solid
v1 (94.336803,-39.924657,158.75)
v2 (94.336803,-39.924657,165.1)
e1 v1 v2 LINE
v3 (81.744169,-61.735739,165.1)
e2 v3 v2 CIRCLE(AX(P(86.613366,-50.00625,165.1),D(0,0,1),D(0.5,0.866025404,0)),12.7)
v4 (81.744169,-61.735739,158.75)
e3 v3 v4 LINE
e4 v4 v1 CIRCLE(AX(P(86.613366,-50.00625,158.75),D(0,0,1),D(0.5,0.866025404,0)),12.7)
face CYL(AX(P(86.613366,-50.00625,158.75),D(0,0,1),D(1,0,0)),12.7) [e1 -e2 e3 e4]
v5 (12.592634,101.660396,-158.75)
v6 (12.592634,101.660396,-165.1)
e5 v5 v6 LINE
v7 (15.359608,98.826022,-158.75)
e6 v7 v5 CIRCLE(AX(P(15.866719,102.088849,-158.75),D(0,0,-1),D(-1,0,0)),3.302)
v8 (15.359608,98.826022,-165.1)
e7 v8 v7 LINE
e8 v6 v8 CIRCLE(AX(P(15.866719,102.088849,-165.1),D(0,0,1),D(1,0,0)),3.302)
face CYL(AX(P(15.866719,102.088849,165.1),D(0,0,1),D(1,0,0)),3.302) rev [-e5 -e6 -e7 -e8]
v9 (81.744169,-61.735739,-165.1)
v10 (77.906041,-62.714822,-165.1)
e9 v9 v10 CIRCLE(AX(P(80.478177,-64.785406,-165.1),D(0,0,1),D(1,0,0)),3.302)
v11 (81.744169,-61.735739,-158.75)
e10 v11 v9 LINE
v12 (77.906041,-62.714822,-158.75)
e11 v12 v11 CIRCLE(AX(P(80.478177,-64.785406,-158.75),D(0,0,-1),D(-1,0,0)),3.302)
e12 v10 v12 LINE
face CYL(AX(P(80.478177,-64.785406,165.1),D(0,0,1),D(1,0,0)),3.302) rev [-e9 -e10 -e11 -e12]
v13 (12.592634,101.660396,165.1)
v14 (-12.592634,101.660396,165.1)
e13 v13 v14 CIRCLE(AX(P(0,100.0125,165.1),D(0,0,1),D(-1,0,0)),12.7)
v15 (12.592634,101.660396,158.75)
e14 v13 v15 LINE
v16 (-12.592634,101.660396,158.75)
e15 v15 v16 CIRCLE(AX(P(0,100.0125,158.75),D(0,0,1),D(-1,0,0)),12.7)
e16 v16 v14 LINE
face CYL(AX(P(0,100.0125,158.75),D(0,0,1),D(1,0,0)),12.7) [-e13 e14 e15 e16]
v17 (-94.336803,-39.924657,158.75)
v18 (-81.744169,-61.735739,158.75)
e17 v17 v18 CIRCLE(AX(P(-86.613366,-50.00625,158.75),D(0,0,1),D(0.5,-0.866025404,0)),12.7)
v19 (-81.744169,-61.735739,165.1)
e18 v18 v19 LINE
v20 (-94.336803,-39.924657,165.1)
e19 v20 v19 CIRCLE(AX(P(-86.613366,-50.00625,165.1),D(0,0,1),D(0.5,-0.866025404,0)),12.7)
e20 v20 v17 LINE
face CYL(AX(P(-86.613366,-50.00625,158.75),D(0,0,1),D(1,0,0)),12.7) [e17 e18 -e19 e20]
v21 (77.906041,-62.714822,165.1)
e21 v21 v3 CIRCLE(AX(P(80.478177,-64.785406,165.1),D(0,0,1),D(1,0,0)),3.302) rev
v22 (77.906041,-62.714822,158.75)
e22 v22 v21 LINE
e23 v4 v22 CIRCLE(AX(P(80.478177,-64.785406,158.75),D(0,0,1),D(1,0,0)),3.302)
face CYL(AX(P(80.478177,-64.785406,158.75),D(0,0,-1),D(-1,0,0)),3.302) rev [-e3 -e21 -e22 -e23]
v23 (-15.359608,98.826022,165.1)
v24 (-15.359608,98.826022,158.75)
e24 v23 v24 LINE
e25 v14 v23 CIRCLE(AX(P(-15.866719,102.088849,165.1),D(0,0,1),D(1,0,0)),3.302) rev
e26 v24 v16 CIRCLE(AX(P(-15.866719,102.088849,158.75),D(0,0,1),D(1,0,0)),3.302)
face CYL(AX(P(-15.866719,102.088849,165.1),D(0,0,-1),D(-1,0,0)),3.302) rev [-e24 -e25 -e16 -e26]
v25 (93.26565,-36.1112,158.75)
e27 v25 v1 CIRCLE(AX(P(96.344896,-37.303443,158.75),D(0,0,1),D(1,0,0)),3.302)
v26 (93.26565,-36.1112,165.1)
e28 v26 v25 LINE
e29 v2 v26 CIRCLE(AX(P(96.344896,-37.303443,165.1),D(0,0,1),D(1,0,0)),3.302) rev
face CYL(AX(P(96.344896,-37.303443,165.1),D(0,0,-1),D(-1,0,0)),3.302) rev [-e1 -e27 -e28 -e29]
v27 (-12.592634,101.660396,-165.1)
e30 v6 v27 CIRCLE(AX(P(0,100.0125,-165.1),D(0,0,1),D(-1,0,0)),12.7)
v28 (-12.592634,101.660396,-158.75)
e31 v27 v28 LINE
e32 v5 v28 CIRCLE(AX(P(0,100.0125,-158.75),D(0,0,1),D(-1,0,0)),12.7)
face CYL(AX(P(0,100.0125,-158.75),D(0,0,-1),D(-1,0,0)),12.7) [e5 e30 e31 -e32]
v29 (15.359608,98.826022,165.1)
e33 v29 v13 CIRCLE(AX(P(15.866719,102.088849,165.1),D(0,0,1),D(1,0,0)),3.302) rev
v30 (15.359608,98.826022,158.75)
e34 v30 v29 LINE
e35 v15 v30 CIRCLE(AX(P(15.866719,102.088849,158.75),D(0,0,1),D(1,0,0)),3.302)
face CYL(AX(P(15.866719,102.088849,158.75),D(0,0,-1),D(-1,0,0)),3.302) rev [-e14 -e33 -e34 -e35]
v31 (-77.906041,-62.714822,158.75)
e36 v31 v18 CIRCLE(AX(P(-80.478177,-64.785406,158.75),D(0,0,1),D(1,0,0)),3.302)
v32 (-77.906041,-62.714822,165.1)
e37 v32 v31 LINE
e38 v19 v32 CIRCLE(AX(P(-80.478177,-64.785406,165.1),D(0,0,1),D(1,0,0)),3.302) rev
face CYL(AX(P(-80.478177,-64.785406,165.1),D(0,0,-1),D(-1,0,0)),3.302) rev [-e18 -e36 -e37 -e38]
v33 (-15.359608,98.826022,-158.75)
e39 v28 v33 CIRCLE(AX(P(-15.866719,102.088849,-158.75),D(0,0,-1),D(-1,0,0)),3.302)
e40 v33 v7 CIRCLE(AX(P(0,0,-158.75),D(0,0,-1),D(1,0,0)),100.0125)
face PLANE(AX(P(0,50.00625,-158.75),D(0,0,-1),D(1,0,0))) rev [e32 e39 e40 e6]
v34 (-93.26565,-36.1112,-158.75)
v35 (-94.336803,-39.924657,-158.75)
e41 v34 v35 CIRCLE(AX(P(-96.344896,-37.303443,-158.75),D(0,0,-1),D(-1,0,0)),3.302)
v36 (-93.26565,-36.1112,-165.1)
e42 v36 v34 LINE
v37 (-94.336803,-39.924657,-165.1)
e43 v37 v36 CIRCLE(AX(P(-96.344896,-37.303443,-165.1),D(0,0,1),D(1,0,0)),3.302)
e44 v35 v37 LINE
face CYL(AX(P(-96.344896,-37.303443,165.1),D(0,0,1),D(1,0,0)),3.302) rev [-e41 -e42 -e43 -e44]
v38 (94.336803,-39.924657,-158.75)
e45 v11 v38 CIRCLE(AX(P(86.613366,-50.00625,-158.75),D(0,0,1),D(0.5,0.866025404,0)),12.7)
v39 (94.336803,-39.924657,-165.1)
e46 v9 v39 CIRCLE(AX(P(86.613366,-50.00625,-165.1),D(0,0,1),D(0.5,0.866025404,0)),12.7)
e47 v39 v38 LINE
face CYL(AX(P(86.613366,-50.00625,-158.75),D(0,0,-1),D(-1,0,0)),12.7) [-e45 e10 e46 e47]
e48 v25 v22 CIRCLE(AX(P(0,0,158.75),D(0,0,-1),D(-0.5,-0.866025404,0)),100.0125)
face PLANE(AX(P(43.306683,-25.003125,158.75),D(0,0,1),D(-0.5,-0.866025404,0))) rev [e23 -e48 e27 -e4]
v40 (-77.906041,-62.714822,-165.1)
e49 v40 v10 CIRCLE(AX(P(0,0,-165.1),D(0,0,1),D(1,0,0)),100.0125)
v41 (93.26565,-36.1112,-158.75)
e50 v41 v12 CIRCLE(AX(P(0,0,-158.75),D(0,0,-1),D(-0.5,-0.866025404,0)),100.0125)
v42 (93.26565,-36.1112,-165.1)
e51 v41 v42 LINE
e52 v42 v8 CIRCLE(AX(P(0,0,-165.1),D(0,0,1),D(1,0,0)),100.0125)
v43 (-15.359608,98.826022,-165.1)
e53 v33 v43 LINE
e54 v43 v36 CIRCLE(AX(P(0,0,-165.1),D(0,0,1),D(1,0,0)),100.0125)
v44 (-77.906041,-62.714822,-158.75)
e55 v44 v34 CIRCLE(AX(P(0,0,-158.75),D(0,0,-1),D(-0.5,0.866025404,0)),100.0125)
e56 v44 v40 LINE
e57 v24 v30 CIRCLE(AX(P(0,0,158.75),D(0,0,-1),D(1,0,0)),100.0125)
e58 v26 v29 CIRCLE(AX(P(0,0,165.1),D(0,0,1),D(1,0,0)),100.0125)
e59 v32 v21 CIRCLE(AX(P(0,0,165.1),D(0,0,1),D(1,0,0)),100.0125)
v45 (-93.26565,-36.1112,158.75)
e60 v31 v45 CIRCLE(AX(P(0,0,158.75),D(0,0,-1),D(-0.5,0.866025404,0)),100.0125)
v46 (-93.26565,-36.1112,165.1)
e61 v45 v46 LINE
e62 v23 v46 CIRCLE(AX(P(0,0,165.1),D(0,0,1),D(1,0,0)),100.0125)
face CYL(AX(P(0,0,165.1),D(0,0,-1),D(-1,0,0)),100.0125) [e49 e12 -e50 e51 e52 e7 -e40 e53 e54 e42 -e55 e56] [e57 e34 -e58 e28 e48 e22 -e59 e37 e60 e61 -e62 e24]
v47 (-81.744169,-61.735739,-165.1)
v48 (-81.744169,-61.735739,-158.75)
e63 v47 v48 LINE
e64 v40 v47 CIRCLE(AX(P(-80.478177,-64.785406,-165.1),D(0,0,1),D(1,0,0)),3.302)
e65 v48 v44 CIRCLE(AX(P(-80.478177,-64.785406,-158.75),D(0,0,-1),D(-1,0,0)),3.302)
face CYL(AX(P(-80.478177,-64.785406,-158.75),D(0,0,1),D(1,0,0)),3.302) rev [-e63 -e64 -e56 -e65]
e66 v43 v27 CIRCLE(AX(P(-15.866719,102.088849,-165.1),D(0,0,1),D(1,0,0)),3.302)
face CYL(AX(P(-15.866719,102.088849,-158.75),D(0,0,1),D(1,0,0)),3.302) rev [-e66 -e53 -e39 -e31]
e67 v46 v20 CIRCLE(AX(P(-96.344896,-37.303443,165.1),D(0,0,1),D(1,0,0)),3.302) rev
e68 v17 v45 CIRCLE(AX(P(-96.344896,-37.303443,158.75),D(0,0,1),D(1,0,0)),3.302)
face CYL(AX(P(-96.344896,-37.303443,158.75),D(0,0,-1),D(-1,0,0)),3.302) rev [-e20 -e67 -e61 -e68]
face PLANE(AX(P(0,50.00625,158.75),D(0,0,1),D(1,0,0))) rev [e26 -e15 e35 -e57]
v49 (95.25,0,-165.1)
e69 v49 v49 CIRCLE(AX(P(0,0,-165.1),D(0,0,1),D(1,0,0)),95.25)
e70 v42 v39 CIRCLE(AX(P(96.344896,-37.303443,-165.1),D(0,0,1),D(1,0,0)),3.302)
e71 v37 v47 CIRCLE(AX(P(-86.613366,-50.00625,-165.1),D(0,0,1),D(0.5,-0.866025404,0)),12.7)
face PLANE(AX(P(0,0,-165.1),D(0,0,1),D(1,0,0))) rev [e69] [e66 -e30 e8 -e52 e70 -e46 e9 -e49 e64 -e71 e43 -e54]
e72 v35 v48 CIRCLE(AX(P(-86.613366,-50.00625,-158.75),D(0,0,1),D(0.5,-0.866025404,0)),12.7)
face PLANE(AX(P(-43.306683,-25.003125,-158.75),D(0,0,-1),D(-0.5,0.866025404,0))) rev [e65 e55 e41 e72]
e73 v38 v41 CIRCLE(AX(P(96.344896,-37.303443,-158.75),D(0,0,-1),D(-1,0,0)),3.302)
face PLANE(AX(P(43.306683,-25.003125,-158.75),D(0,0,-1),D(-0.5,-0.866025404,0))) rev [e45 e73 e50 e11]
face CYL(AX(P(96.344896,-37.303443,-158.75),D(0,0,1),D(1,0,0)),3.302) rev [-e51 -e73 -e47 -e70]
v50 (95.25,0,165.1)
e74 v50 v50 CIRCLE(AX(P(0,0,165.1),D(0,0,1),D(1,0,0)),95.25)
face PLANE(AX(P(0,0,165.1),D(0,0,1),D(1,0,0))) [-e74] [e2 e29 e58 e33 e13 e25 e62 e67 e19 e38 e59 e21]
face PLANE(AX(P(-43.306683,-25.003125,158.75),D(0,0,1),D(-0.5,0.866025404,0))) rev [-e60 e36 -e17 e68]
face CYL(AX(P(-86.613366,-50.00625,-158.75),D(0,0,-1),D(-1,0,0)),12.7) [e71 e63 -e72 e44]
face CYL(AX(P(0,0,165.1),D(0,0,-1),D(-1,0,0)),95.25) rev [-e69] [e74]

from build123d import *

# Parameters (mm, degrees)
SKETCH1_R                = 100.0125
SKETCH1_R_2              = 95.25
EXTRUDE_THIN1_DEPTH      = 165.1
BOSS_EXTRUDE1_DEPTH      = 6.35
FILLET1_R                = 3.302
CIRPATTERN1_COUNT        = 3
FILLET1_OF_CIRPATTERN1_R = 3.302
MIRROR2_START            = -165.1
MIRROR2_DEPTH            = 6.35


# Read off the part's stored shape, not the designer's step: Mirror2
with BuildPart() as part:
    # Sketch1 → Extrude-Thin1 (new, symmetric)
    with BuildSketch(Plane.XY):
        Circle(SKETCH1_R)
        Circle(SKETCH1_R_2, mode=Mode.SUBTRACT)
    extrude(amount=EXTRUDE_THIN1_DEPTH, both=True)

    # Sketch2 → Boss-Extrude1 (add)
    with BuildSketch(Plane.XY.offset(165.1)):
        with BuildLine():
            ThreePointArc((-12.674375762, 99.206150794), (0, 112.7125), (12.674375762, 99.206150794))
            ThreePointArc((12.674375762, 99.206150794), (0, 100.0125), (-12.674375762, 99.206150794))
        make_face()
    boss_extrude1 = extrude(amount=-BOSS_EXTRUDE1_DEPTH)

    # Fillet1
    fillet1_edges = [part.edges().sort_by_distance(p)[0] for p in [
        (12.674375762, 99.206150794, 161.925),
        (-12.674375762, 99.206150794, 161.925),
    ]]
    fillet(fillet1_edges, radius=FILLET1_R)

    # CirPattern1: Boss-Extrude1 ×3 about axis
    cirpattern1_axis = Axis((0, 0, 0), (0, 0, 1))
    for i in range(1, CIRPATTERN1_COUNT):
        add(boss_extrude1.rotate(cirpattern1_axis, i * 360 / CIRPATTERN1_COUNT))

    # Fillet1 of CirPattern1
    fillet1_of_cirpattern1_edges = [part.edges().sort_by_distance(p)[0] for p in [
        (-92.25223468, -38.62674401, 161.925),
        (-79.577858918, -60.579406784, 161.925),
        (79.577858918, -60.579406784, 161.925),
        (92.25223468, -38.62674401, 161.925),
    ]]
    fillet(fillet1_of_cirpattern1_edges, radius=FILLET1_OF_CIRPATTERN1_R)

    # Mirror2 outline → Mirror2 (add)
    with BuildSketch(Plane.XY.offset(MIRROR2_START)):
        with BuildLine():
            ThreePointArc((12.592634281, 101.660396196), (0, 112.7125), (-12.592634281, 101.660396196))
            ThreePointArc((-12.592634281, 101.660396196), (-13.503928486, 99.78224476), (-15.359608316, 98.826021819))
            ThreePointArc((-15.359608316, 98.826021819), (0, 100.0125), (15.359608316, 98.826021819))
            ThreePointArc((15.359608316, 98.826021819), (13.503928486, 99.78224476), (12.592634281, 101.660396196))
        make_face()
        with BuildLine():
            ThreePointArc((-77.906041293, -62.714821903), (-86.613365696, -50.00625), (-93.265649608, -36.111199916))
            ThreePointArc((-93.265649608, -36.111199916), (-93.165923052, -38.19637726), (-94.336802804, -39.92465691))
            ThreePointArc((-94.336802804, -39.92465691), (-97.611888324, -56.35625), (-81.744168524, -61.735739285))
            ThreePointArc((-81.744168524, -61.735739285), (-79.661994566, -61.5858675), (-77.906041293, -62.714821903))
        make_face()
        with BuildLine():
            ThreePointArc((94.336802804, -39.92465691), (93.165923052, -38.19637726), (93.265649608, -36.111199916))
            ThreePointArc((93.265649608, -36.111199916), (86.613365696, -50.00625), (77.906041293, -62.714821903))
            ThreePointArc((77.906041293, -62.714821903), (79.661994566, -61.5858675), (81.744168524, -61.735739285))
            ThreePointArc((81.744168524, -61.735739285), (97.611888324, -56.35625), (94.336802804, -39.92465691))
        make_face()
    extrude(amount=MIRROR2_DEPTH)


solid = part.part
